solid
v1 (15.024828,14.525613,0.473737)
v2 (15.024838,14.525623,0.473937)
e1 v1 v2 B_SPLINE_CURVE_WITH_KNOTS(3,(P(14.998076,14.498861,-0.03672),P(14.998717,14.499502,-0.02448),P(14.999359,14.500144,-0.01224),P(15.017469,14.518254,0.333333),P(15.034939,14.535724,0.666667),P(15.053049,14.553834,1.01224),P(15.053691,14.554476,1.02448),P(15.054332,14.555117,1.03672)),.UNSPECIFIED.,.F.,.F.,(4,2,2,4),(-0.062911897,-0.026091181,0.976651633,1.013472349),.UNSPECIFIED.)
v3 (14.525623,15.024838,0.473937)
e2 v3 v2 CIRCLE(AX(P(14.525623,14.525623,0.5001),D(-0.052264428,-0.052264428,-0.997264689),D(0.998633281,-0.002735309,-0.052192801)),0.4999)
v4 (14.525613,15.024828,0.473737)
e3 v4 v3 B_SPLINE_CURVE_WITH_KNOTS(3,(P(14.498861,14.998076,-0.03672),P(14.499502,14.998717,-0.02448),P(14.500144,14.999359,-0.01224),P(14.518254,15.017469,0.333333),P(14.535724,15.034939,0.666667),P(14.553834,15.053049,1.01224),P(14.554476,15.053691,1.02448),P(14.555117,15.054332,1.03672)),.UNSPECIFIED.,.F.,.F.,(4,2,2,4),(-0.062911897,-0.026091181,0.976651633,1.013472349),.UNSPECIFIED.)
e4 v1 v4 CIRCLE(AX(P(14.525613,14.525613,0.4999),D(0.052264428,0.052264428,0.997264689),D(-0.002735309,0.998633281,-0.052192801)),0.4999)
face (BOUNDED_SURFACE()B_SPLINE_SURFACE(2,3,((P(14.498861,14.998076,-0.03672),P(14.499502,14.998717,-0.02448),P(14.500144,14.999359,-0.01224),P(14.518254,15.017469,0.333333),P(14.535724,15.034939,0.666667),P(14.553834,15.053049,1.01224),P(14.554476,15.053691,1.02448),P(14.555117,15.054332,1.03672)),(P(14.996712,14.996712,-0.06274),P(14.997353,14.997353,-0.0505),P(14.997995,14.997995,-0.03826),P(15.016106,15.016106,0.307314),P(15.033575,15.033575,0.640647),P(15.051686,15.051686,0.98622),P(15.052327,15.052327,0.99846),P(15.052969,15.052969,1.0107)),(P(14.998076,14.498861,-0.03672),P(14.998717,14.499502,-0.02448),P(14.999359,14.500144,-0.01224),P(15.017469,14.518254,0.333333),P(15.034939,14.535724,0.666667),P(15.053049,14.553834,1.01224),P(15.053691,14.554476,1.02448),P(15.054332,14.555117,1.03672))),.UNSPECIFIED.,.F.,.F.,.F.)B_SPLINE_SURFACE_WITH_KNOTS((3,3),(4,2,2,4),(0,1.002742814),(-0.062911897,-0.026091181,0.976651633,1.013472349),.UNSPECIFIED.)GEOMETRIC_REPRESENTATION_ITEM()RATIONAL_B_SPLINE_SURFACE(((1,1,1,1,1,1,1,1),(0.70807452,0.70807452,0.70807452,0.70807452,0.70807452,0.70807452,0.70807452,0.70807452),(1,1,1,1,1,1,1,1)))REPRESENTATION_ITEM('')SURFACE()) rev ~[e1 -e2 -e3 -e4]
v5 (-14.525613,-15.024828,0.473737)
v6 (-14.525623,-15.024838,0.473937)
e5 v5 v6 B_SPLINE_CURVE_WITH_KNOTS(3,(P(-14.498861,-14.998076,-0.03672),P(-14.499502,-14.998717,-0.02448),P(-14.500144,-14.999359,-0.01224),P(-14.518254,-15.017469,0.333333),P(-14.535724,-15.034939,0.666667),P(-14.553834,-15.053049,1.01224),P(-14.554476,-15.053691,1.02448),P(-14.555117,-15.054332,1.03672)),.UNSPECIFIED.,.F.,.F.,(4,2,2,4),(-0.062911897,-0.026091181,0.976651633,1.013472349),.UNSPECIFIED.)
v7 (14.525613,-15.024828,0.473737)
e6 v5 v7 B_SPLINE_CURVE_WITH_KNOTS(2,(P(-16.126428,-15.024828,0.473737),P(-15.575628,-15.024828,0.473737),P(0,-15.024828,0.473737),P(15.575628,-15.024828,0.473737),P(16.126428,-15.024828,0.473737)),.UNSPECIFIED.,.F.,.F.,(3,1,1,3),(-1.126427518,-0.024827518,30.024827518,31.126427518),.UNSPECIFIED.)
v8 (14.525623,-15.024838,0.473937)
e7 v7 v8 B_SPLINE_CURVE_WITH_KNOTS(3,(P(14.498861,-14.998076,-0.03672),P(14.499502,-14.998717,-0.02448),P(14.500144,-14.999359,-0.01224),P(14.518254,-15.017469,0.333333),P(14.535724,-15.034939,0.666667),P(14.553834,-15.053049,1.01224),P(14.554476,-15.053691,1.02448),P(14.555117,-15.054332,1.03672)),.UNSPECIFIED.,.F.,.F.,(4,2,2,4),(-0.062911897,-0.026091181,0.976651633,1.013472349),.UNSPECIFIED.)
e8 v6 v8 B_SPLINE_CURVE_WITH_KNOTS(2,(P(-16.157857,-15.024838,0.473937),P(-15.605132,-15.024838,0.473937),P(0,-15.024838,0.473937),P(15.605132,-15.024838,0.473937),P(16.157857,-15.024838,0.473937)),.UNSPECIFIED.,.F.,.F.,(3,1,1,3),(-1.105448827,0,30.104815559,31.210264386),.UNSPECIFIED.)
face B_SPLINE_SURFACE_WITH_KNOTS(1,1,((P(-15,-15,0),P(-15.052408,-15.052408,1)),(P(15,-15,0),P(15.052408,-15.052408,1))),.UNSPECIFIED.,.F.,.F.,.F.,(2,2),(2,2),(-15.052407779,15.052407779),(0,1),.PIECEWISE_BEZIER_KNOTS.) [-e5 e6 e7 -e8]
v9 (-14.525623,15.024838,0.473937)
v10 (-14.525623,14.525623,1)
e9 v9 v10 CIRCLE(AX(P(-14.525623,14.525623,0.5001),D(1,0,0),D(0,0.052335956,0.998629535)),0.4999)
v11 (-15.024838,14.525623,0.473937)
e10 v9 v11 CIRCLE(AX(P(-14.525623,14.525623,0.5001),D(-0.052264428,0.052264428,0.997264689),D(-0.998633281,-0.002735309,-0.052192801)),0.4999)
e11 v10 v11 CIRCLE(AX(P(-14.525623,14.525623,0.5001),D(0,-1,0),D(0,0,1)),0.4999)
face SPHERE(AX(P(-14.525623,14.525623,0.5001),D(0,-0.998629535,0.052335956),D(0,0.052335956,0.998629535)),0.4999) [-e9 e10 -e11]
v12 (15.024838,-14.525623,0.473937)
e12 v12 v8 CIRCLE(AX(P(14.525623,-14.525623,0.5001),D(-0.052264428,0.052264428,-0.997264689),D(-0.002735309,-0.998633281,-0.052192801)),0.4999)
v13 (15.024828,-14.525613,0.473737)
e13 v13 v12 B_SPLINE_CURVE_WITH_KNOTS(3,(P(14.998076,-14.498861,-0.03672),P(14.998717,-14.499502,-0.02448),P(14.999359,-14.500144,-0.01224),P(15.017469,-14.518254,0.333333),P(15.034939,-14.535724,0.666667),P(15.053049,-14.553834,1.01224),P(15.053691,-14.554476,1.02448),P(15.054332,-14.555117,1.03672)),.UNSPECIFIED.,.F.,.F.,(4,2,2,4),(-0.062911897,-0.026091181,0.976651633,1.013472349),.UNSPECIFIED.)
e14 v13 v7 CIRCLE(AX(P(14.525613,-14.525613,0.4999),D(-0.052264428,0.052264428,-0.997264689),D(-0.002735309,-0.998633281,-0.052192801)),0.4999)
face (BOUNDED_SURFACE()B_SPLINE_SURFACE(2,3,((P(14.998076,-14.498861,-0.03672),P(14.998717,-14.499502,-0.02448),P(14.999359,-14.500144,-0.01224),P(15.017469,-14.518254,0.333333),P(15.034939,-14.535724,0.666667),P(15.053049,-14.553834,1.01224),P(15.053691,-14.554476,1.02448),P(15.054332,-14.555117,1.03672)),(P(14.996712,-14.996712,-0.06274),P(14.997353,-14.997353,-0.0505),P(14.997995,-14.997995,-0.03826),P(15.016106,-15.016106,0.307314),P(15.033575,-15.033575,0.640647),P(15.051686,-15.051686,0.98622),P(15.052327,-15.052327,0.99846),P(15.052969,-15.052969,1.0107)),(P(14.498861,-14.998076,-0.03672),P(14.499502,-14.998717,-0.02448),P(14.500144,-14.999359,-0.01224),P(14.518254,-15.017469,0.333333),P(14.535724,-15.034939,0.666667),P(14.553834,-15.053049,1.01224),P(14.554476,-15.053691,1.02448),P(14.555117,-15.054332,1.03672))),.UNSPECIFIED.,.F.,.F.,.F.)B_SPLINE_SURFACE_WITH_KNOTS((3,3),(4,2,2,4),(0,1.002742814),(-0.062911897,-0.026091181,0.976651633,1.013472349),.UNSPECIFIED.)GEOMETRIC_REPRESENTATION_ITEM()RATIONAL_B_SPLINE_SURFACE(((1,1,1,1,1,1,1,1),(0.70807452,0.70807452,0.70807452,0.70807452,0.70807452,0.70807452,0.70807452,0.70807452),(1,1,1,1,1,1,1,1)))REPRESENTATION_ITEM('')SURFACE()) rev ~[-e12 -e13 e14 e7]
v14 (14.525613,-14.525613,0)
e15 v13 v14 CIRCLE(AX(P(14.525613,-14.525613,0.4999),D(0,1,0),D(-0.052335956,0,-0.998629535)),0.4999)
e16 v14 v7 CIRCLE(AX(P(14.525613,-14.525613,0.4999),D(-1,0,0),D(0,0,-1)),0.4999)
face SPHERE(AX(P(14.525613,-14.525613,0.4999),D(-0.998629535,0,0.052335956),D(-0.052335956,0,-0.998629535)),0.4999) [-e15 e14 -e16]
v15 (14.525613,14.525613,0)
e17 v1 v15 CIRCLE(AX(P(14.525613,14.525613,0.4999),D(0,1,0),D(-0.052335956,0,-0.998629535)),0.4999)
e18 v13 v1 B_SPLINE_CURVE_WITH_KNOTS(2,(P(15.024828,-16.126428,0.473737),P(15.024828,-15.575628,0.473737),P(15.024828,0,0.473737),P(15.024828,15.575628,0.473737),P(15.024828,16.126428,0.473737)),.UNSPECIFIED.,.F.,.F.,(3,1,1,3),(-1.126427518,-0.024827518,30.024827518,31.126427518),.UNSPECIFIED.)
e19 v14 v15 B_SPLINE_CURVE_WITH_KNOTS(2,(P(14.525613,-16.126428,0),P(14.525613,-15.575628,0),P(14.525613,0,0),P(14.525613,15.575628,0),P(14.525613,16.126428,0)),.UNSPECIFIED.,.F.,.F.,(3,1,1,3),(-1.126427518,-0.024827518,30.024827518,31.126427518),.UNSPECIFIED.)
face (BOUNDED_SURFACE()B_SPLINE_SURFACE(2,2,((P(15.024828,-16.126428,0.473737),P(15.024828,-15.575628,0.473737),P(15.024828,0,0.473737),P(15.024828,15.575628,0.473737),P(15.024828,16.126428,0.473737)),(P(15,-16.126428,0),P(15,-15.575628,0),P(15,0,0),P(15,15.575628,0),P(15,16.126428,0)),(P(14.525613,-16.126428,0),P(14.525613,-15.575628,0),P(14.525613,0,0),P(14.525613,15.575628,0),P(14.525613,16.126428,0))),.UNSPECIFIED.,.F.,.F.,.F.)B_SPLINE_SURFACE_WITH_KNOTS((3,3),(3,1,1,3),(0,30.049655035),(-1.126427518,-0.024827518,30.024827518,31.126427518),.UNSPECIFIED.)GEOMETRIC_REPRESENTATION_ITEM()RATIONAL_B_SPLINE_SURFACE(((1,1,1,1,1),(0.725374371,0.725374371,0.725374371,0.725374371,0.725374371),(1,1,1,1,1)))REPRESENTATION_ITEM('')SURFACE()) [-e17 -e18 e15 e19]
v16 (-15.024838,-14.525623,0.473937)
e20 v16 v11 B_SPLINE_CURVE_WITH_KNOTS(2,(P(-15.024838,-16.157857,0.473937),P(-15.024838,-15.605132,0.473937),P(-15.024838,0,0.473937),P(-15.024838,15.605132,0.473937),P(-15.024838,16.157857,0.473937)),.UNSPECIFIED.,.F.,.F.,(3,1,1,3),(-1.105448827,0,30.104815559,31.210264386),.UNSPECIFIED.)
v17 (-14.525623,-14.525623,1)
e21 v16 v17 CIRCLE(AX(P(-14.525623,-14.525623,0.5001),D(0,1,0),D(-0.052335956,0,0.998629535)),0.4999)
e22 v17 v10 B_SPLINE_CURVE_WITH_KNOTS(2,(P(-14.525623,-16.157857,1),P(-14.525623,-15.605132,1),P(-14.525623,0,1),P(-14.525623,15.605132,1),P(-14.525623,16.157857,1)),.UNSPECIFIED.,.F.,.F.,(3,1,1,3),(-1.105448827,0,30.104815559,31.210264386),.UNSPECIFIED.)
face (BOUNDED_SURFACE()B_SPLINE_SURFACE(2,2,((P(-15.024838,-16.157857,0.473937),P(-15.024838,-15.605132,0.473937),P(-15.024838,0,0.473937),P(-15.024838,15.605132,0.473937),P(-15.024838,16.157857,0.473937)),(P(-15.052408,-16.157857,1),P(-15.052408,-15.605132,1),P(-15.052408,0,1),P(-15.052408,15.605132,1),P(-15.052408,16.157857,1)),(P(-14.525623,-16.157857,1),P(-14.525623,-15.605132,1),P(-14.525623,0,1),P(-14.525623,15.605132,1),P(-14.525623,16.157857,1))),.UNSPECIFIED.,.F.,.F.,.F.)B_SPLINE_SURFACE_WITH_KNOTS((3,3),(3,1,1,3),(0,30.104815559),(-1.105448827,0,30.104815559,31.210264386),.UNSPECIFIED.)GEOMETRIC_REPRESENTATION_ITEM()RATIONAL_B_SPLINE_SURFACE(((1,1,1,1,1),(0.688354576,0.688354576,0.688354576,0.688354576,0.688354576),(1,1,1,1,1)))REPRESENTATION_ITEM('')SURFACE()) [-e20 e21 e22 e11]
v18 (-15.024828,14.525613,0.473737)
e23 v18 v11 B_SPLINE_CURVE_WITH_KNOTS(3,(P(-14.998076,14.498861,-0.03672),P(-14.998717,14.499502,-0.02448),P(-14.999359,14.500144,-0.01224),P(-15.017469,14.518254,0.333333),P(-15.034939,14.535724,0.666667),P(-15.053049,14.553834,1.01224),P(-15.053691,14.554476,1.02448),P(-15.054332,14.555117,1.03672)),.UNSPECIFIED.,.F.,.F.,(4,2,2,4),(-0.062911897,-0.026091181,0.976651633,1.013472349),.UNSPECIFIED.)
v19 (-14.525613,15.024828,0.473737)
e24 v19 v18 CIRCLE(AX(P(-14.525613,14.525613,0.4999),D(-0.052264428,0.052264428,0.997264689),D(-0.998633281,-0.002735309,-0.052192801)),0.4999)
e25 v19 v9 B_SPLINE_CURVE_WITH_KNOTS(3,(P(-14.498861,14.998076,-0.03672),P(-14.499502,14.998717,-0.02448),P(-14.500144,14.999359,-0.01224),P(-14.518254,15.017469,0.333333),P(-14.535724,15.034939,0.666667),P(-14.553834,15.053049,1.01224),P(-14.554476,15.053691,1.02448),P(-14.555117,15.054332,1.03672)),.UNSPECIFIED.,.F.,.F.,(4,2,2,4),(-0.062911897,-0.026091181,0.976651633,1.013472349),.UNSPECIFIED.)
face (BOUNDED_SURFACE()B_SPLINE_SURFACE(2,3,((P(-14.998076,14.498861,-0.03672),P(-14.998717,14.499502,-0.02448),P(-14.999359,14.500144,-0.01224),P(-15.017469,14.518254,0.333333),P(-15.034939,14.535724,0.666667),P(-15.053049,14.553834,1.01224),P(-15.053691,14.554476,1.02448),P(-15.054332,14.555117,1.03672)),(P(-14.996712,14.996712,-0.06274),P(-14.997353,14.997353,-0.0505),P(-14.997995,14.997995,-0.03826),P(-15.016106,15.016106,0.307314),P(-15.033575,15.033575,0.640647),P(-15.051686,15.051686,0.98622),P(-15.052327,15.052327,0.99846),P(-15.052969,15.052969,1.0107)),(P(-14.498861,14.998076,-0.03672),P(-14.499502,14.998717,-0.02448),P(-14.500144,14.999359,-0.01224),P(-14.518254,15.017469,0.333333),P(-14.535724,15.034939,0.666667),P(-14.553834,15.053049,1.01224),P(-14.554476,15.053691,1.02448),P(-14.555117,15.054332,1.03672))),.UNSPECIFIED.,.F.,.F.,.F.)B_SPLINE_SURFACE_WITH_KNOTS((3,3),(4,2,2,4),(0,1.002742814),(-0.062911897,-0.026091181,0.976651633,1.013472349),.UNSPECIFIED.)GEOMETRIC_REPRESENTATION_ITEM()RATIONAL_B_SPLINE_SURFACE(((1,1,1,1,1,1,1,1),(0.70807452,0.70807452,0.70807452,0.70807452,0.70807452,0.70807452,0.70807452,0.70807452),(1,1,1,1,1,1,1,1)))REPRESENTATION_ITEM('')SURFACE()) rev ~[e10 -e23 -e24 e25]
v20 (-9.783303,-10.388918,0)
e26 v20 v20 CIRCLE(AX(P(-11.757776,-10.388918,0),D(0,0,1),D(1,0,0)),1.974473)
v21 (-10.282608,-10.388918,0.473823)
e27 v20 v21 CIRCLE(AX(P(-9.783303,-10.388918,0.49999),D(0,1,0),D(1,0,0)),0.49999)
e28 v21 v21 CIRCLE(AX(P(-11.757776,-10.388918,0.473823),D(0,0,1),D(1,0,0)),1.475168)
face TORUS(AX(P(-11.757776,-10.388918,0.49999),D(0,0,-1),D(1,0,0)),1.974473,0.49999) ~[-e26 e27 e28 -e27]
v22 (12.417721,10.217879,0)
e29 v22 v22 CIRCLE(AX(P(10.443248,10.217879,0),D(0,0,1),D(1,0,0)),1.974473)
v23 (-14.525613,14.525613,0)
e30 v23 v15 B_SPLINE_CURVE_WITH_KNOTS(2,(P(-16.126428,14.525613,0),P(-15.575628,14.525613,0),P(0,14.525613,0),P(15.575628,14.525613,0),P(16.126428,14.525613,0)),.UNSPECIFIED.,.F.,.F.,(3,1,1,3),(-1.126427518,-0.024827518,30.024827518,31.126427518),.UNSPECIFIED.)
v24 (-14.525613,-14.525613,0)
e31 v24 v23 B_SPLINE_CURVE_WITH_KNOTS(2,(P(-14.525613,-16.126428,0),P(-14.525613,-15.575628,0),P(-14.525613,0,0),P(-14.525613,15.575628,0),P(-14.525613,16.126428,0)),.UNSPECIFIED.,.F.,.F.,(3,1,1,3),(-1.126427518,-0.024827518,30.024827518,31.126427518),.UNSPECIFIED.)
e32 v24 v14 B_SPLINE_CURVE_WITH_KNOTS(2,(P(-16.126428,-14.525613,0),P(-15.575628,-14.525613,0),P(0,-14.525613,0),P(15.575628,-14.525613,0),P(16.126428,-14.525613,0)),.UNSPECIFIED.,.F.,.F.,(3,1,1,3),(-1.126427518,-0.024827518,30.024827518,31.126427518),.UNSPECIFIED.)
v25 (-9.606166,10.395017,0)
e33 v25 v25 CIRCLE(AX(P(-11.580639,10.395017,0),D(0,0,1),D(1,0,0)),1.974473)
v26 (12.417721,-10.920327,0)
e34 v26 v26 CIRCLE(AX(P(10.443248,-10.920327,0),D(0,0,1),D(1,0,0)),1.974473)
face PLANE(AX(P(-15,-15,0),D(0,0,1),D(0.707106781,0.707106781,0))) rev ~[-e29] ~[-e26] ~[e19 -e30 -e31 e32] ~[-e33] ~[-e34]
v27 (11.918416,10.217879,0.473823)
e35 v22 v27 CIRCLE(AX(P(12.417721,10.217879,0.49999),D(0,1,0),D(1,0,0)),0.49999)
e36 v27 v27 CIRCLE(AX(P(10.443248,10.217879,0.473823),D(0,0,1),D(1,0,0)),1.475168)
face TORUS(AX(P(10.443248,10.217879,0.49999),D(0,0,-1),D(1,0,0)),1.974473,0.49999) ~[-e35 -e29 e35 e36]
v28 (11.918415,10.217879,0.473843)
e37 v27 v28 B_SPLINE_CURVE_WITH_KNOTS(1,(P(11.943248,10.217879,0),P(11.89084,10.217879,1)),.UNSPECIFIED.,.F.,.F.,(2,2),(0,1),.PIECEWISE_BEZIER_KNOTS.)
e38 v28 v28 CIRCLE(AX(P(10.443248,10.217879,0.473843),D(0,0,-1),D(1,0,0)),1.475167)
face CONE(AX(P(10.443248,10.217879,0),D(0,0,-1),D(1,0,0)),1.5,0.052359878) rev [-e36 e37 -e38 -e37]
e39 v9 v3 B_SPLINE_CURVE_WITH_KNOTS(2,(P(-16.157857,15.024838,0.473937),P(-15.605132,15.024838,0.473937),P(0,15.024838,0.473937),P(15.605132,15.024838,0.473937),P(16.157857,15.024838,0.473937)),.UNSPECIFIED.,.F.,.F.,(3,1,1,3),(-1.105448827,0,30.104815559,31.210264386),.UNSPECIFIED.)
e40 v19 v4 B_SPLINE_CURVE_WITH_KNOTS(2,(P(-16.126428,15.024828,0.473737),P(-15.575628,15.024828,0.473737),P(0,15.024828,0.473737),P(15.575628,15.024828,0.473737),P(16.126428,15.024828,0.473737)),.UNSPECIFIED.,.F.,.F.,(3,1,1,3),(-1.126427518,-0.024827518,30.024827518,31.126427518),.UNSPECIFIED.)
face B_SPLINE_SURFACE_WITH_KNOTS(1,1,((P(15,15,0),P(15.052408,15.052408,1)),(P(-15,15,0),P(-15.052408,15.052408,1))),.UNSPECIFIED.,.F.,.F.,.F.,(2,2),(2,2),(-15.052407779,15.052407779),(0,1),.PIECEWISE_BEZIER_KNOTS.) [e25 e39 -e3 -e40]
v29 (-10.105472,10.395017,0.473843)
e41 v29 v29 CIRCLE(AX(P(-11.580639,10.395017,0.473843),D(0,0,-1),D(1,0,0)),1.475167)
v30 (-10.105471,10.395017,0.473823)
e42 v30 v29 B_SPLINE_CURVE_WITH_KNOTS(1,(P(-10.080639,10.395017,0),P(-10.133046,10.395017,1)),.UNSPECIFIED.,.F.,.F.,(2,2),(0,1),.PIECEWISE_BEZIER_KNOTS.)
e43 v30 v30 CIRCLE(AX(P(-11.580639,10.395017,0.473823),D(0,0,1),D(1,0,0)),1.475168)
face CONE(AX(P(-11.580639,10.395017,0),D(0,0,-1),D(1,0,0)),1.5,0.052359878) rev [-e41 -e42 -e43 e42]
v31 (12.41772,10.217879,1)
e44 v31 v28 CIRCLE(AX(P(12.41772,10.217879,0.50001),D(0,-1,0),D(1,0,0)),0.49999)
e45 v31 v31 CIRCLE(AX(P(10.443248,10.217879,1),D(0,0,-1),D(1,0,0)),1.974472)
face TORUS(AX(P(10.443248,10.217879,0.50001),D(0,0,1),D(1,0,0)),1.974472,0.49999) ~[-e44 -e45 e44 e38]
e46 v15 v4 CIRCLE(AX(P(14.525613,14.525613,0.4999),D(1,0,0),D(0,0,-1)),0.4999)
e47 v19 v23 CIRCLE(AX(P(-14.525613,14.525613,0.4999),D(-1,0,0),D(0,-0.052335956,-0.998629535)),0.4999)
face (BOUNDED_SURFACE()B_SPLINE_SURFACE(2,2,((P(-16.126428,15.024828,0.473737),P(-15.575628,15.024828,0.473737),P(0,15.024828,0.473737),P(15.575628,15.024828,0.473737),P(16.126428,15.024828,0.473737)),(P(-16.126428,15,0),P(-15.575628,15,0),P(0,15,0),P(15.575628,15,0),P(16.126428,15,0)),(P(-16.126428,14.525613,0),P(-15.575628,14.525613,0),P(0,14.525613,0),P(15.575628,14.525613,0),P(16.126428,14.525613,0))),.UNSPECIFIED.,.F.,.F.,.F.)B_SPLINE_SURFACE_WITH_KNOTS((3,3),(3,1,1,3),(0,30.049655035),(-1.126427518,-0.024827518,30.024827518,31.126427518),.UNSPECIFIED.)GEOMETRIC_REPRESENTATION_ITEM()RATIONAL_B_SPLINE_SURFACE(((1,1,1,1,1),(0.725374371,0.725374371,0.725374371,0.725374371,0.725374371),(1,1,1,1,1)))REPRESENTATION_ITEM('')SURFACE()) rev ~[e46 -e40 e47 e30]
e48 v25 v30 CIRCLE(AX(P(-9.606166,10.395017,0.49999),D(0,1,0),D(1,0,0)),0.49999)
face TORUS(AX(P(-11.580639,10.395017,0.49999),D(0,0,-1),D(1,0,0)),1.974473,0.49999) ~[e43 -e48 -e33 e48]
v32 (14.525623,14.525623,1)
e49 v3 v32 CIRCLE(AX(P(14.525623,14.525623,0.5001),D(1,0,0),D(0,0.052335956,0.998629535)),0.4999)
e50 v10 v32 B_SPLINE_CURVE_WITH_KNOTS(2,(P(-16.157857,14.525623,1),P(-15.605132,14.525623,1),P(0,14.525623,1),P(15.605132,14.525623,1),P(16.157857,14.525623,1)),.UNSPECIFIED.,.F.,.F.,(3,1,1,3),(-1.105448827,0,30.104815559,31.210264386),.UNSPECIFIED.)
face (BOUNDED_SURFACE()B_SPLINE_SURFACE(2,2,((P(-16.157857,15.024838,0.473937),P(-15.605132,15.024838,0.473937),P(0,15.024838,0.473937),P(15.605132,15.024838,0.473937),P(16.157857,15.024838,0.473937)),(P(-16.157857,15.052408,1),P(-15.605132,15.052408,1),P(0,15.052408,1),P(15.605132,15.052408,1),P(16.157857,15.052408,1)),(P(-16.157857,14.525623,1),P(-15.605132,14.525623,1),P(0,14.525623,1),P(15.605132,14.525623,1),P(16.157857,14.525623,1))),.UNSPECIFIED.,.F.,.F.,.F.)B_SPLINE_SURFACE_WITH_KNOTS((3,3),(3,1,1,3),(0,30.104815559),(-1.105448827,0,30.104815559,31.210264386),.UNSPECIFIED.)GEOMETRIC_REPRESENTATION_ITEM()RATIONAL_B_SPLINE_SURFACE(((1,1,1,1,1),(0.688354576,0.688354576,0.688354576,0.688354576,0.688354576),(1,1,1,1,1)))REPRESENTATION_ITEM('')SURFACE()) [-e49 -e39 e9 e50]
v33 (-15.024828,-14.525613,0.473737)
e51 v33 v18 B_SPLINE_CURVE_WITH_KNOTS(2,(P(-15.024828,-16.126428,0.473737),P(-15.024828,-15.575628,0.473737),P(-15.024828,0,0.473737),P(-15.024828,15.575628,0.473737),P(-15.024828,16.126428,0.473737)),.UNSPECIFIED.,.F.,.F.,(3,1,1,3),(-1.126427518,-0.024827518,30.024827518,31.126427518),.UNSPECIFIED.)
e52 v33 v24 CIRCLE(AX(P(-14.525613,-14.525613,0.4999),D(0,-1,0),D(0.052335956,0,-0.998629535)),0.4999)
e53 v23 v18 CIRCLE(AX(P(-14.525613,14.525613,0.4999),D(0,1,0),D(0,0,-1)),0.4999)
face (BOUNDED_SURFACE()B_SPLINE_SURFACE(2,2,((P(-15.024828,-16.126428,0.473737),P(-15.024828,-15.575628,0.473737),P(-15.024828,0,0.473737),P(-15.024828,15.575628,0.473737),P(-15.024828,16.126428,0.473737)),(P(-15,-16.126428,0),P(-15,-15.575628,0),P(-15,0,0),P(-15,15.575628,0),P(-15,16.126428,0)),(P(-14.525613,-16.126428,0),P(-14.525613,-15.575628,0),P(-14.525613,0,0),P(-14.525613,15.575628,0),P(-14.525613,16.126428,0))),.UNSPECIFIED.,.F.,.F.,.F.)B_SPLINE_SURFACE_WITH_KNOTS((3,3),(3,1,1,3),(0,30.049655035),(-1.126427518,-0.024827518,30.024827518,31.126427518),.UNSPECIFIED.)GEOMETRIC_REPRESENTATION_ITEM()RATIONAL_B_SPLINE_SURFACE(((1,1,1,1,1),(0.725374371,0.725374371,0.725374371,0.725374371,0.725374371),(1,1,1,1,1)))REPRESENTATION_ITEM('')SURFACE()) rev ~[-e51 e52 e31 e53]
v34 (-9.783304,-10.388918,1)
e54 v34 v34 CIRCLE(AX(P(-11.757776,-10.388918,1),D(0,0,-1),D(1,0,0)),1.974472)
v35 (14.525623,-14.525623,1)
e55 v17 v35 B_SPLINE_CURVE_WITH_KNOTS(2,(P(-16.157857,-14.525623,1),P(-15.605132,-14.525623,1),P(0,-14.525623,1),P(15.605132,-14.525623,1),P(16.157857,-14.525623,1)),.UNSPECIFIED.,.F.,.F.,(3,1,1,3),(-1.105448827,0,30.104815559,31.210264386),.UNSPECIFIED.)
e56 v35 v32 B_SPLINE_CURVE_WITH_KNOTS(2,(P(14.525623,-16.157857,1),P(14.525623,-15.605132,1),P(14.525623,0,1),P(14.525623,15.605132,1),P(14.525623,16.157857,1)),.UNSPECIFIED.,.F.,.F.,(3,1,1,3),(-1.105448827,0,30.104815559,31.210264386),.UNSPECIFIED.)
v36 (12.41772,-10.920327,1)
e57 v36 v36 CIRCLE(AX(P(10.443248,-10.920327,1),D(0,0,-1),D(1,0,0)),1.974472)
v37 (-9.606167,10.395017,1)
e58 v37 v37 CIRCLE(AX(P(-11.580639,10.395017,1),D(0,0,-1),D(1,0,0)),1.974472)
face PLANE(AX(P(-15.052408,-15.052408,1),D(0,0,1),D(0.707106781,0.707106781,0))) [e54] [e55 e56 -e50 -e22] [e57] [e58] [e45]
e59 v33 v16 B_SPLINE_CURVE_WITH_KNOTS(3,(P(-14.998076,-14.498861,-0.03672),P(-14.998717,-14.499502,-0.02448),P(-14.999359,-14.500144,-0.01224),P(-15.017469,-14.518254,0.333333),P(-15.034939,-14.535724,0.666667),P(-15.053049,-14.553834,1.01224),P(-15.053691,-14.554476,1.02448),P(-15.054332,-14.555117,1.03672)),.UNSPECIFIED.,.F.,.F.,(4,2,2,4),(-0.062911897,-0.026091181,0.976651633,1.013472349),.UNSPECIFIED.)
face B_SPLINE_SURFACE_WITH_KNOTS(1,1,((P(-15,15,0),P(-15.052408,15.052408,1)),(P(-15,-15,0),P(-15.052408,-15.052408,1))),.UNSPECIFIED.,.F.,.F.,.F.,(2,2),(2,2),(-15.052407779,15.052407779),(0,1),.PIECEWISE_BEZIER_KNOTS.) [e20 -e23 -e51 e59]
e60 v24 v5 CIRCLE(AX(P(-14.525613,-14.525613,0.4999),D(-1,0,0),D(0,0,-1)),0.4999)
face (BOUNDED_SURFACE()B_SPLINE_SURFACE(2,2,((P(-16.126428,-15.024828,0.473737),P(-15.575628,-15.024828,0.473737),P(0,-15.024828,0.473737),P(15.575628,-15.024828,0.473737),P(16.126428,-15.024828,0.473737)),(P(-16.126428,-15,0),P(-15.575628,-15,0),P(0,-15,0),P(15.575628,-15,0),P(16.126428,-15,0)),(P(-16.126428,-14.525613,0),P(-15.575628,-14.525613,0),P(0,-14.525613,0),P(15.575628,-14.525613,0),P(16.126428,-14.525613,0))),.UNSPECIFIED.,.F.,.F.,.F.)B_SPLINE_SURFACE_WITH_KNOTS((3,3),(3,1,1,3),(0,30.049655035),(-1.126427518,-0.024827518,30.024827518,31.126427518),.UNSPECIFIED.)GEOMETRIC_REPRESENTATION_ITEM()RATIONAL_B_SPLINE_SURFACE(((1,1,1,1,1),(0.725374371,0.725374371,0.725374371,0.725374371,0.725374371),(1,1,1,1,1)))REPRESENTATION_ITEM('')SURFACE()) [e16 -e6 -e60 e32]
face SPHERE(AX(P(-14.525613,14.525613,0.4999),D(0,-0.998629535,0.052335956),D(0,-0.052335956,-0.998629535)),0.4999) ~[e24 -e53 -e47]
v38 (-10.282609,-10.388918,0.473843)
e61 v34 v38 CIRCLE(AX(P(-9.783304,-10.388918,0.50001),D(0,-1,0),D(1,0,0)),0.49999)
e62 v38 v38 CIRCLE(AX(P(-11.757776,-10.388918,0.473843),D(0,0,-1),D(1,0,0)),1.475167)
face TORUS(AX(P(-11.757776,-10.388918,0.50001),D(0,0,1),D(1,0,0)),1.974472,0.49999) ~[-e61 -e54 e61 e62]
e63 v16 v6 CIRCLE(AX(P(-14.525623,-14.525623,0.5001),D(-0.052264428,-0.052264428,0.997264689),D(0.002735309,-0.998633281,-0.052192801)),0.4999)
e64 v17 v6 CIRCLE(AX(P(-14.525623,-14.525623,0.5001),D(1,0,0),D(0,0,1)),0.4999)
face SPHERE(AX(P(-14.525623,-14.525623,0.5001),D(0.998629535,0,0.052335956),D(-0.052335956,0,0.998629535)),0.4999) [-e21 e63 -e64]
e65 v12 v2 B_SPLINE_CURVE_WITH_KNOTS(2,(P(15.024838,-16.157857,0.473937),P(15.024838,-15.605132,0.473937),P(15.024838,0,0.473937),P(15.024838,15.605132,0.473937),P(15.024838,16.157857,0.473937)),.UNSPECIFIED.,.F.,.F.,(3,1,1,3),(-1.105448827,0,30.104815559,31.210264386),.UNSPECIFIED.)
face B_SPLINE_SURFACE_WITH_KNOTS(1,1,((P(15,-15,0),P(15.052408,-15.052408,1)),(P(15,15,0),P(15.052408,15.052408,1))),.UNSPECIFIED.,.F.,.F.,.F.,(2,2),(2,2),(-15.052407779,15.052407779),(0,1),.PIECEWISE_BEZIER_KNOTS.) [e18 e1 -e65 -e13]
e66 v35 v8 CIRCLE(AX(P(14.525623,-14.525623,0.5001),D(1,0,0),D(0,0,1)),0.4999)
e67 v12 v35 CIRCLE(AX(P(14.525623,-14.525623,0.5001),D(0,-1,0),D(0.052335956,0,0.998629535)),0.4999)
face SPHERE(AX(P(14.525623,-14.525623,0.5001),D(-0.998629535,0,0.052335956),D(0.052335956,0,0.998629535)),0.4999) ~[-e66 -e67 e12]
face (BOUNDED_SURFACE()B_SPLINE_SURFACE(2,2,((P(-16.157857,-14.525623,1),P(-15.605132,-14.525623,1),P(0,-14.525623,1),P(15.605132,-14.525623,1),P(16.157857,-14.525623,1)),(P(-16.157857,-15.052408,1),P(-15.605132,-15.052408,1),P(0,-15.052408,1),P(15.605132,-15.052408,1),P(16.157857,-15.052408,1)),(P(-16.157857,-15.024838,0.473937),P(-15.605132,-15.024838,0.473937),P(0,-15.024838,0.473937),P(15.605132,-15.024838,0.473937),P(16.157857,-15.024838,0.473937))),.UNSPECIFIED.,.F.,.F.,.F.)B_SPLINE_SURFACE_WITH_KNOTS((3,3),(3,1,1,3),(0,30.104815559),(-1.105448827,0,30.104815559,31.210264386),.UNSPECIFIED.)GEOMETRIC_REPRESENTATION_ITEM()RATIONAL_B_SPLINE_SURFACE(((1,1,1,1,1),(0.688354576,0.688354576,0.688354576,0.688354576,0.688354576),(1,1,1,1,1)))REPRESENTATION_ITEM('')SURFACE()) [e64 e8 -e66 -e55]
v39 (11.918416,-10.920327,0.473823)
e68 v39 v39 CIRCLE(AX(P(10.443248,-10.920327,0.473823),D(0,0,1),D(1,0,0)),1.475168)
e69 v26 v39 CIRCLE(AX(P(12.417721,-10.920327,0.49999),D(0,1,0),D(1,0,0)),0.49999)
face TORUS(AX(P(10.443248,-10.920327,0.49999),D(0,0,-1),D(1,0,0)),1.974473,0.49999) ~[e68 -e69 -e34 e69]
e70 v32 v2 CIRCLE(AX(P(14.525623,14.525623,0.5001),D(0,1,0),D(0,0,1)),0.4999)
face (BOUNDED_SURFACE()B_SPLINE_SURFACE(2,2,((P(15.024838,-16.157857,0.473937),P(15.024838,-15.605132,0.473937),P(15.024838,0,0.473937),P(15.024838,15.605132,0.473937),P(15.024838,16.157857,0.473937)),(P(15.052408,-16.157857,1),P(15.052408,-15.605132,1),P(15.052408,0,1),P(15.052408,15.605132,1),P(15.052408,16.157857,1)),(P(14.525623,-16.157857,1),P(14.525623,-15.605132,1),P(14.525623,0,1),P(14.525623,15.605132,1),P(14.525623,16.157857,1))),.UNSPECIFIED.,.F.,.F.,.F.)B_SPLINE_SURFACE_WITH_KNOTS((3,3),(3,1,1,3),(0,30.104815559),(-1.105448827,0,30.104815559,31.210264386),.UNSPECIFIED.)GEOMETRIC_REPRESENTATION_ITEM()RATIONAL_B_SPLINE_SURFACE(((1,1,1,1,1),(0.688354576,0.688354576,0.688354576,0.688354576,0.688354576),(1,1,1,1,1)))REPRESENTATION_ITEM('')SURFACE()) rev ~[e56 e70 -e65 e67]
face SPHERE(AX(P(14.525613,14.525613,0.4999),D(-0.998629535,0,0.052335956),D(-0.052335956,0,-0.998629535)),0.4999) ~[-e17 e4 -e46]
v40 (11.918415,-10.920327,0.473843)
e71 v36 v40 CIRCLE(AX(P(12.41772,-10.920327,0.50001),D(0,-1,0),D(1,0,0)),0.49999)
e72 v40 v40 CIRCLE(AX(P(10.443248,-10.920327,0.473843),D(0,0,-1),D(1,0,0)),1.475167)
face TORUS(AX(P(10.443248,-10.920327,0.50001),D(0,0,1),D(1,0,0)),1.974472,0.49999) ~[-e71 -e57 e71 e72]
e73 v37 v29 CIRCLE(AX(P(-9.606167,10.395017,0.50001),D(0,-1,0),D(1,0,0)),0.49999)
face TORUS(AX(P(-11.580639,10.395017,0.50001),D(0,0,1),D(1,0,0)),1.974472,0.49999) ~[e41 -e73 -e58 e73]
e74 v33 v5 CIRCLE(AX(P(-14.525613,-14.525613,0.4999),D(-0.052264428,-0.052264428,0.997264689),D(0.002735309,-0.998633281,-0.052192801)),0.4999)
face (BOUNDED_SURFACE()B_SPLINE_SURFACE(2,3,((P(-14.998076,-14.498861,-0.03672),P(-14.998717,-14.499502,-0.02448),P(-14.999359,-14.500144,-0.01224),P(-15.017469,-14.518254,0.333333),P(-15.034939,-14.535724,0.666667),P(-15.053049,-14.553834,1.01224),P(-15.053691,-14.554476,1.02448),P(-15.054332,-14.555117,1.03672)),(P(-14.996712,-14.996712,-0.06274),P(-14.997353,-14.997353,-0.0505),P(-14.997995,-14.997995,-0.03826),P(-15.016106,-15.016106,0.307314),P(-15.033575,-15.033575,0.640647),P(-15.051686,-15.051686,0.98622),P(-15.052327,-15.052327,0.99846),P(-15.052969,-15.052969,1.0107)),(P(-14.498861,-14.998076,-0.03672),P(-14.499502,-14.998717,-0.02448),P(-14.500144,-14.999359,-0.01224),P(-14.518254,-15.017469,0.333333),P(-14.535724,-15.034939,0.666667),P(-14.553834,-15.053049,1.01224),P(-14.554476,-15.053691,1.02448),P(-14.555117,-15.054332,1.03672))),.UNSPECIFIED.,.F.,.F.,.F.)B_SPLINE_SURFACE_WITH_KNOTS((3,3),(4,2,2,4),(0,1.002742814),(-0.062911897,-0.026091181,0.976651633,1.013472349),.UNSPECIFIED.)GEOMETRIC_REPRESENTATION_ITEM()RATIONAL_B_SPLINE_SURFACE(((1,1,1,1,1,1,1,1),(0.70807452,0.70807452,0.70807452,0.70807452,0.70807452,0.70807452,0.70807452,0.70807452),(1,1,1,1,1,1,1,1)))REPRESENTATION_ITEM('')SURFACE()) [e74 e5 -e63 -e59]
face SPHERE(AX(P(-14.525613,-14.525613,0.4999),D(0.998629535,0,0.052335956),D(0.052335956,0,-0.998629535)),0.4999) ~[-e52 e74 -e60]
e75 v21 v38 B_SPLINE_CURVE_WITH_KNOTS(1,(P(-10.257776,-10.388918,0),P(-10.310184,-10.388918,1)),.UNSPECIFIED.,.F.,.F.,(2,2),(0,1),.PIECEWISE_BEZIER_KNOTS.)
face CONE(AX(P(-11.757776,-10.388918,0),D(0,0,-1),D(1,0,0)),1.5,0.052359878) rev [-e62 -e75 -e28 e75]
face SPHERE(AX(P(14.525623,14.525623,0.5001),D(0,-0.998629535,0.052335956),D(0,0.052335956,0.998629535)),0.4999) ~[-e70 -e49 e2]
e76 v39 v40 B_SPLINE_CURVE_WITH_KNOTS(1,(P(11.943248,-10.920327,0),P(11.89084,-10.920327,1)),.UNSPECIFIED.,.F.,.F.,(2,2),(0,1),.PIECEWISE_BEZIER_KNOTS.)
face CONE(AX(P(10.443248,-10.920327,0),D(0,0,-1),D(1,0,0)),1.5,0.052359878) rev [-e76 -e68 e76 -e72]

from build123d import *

# Parameters (mm, degrees)
F0_W     = 30
F0_H     = 30
F0_R     = 1.5
F1_DEPTH = 1
F1_TAPER = -3
F2_R     = 0.4999
F3_R     = 0.49999


# Not quite as in the source:
# - a fillet or chamfer is up to 0.001 mm smaller than in the source, because OpenCascade refuses the exact size


with BuildPart() as f1:
    # F0 (on Top) → F1 (new body)
    with BuildSketch(Plane.XY):
        Rectangle(F0_W, F0_H)
        with Locations((-11.7577761412, -10.388918221)):
            Circle(F0_R, mode=Mode.SUBTRACT)
        with Locations((10.4432478547, -10.9203271568)):
            Circle(F0_R, mode=Mode.SUBTRACT)
        with Locations((-11.5806385875, 10.3950165212)):
            Circle(F0_R, mode=Mode.SUBTRACT)
        with Locations((10.4432478547, 10.2178789675)):
            Circle(F0_R, mode=Mode.SUBTRACT)
    extrude(amount=F1_DEPTH, taper=F1_TAPER)

    # F2 (radius 0.5 in the source; OpenCascade refuses exactly that, so slightly less here)
    f2_edges = [f1.edges().sort_by_distance(p)[0] for p in [
        (0, -15.052408, 1),
        (0, -15, 0),
        (-15, 0, 0),
        (-15.052408, 0, 1),
        (15.052408, 0, 1),
        (0, 15.052408, 1),
        (0, 15, 0),
        (15, 0, 0),
        (-15.026204, -15.026204, 0.5),
        (15.026204, -15.026204, 0.5),
        (-15.026204, 15.026204, 0.5),
        (15.026204, 15.026204, 0.5),
    ]]
    fillet(f2_edges, radius=F2_R)

    # F3 (radius 0.5 in the source; OpenCascade refuses exactly that, so slightly less here)
    f3_edges = [f1.edges().sort_by_distance(p)[0] for p in [
        (8.995656, -10.920327, 1),
        (-13.205368, -10.388918, 1),
        (-13.028231, 10.395017, 1),
        (8.995656, 10.217879, 1),
        (8.943248, -10.920327, 0),
        (-13.257776, -10.388918, 0),
        (-13.080639, 10.395017, 0),
        (8.943248, 10.217879, 0),
    ]]
    fillet(f3_edges, radius=F3_R)


solid = f1.part
